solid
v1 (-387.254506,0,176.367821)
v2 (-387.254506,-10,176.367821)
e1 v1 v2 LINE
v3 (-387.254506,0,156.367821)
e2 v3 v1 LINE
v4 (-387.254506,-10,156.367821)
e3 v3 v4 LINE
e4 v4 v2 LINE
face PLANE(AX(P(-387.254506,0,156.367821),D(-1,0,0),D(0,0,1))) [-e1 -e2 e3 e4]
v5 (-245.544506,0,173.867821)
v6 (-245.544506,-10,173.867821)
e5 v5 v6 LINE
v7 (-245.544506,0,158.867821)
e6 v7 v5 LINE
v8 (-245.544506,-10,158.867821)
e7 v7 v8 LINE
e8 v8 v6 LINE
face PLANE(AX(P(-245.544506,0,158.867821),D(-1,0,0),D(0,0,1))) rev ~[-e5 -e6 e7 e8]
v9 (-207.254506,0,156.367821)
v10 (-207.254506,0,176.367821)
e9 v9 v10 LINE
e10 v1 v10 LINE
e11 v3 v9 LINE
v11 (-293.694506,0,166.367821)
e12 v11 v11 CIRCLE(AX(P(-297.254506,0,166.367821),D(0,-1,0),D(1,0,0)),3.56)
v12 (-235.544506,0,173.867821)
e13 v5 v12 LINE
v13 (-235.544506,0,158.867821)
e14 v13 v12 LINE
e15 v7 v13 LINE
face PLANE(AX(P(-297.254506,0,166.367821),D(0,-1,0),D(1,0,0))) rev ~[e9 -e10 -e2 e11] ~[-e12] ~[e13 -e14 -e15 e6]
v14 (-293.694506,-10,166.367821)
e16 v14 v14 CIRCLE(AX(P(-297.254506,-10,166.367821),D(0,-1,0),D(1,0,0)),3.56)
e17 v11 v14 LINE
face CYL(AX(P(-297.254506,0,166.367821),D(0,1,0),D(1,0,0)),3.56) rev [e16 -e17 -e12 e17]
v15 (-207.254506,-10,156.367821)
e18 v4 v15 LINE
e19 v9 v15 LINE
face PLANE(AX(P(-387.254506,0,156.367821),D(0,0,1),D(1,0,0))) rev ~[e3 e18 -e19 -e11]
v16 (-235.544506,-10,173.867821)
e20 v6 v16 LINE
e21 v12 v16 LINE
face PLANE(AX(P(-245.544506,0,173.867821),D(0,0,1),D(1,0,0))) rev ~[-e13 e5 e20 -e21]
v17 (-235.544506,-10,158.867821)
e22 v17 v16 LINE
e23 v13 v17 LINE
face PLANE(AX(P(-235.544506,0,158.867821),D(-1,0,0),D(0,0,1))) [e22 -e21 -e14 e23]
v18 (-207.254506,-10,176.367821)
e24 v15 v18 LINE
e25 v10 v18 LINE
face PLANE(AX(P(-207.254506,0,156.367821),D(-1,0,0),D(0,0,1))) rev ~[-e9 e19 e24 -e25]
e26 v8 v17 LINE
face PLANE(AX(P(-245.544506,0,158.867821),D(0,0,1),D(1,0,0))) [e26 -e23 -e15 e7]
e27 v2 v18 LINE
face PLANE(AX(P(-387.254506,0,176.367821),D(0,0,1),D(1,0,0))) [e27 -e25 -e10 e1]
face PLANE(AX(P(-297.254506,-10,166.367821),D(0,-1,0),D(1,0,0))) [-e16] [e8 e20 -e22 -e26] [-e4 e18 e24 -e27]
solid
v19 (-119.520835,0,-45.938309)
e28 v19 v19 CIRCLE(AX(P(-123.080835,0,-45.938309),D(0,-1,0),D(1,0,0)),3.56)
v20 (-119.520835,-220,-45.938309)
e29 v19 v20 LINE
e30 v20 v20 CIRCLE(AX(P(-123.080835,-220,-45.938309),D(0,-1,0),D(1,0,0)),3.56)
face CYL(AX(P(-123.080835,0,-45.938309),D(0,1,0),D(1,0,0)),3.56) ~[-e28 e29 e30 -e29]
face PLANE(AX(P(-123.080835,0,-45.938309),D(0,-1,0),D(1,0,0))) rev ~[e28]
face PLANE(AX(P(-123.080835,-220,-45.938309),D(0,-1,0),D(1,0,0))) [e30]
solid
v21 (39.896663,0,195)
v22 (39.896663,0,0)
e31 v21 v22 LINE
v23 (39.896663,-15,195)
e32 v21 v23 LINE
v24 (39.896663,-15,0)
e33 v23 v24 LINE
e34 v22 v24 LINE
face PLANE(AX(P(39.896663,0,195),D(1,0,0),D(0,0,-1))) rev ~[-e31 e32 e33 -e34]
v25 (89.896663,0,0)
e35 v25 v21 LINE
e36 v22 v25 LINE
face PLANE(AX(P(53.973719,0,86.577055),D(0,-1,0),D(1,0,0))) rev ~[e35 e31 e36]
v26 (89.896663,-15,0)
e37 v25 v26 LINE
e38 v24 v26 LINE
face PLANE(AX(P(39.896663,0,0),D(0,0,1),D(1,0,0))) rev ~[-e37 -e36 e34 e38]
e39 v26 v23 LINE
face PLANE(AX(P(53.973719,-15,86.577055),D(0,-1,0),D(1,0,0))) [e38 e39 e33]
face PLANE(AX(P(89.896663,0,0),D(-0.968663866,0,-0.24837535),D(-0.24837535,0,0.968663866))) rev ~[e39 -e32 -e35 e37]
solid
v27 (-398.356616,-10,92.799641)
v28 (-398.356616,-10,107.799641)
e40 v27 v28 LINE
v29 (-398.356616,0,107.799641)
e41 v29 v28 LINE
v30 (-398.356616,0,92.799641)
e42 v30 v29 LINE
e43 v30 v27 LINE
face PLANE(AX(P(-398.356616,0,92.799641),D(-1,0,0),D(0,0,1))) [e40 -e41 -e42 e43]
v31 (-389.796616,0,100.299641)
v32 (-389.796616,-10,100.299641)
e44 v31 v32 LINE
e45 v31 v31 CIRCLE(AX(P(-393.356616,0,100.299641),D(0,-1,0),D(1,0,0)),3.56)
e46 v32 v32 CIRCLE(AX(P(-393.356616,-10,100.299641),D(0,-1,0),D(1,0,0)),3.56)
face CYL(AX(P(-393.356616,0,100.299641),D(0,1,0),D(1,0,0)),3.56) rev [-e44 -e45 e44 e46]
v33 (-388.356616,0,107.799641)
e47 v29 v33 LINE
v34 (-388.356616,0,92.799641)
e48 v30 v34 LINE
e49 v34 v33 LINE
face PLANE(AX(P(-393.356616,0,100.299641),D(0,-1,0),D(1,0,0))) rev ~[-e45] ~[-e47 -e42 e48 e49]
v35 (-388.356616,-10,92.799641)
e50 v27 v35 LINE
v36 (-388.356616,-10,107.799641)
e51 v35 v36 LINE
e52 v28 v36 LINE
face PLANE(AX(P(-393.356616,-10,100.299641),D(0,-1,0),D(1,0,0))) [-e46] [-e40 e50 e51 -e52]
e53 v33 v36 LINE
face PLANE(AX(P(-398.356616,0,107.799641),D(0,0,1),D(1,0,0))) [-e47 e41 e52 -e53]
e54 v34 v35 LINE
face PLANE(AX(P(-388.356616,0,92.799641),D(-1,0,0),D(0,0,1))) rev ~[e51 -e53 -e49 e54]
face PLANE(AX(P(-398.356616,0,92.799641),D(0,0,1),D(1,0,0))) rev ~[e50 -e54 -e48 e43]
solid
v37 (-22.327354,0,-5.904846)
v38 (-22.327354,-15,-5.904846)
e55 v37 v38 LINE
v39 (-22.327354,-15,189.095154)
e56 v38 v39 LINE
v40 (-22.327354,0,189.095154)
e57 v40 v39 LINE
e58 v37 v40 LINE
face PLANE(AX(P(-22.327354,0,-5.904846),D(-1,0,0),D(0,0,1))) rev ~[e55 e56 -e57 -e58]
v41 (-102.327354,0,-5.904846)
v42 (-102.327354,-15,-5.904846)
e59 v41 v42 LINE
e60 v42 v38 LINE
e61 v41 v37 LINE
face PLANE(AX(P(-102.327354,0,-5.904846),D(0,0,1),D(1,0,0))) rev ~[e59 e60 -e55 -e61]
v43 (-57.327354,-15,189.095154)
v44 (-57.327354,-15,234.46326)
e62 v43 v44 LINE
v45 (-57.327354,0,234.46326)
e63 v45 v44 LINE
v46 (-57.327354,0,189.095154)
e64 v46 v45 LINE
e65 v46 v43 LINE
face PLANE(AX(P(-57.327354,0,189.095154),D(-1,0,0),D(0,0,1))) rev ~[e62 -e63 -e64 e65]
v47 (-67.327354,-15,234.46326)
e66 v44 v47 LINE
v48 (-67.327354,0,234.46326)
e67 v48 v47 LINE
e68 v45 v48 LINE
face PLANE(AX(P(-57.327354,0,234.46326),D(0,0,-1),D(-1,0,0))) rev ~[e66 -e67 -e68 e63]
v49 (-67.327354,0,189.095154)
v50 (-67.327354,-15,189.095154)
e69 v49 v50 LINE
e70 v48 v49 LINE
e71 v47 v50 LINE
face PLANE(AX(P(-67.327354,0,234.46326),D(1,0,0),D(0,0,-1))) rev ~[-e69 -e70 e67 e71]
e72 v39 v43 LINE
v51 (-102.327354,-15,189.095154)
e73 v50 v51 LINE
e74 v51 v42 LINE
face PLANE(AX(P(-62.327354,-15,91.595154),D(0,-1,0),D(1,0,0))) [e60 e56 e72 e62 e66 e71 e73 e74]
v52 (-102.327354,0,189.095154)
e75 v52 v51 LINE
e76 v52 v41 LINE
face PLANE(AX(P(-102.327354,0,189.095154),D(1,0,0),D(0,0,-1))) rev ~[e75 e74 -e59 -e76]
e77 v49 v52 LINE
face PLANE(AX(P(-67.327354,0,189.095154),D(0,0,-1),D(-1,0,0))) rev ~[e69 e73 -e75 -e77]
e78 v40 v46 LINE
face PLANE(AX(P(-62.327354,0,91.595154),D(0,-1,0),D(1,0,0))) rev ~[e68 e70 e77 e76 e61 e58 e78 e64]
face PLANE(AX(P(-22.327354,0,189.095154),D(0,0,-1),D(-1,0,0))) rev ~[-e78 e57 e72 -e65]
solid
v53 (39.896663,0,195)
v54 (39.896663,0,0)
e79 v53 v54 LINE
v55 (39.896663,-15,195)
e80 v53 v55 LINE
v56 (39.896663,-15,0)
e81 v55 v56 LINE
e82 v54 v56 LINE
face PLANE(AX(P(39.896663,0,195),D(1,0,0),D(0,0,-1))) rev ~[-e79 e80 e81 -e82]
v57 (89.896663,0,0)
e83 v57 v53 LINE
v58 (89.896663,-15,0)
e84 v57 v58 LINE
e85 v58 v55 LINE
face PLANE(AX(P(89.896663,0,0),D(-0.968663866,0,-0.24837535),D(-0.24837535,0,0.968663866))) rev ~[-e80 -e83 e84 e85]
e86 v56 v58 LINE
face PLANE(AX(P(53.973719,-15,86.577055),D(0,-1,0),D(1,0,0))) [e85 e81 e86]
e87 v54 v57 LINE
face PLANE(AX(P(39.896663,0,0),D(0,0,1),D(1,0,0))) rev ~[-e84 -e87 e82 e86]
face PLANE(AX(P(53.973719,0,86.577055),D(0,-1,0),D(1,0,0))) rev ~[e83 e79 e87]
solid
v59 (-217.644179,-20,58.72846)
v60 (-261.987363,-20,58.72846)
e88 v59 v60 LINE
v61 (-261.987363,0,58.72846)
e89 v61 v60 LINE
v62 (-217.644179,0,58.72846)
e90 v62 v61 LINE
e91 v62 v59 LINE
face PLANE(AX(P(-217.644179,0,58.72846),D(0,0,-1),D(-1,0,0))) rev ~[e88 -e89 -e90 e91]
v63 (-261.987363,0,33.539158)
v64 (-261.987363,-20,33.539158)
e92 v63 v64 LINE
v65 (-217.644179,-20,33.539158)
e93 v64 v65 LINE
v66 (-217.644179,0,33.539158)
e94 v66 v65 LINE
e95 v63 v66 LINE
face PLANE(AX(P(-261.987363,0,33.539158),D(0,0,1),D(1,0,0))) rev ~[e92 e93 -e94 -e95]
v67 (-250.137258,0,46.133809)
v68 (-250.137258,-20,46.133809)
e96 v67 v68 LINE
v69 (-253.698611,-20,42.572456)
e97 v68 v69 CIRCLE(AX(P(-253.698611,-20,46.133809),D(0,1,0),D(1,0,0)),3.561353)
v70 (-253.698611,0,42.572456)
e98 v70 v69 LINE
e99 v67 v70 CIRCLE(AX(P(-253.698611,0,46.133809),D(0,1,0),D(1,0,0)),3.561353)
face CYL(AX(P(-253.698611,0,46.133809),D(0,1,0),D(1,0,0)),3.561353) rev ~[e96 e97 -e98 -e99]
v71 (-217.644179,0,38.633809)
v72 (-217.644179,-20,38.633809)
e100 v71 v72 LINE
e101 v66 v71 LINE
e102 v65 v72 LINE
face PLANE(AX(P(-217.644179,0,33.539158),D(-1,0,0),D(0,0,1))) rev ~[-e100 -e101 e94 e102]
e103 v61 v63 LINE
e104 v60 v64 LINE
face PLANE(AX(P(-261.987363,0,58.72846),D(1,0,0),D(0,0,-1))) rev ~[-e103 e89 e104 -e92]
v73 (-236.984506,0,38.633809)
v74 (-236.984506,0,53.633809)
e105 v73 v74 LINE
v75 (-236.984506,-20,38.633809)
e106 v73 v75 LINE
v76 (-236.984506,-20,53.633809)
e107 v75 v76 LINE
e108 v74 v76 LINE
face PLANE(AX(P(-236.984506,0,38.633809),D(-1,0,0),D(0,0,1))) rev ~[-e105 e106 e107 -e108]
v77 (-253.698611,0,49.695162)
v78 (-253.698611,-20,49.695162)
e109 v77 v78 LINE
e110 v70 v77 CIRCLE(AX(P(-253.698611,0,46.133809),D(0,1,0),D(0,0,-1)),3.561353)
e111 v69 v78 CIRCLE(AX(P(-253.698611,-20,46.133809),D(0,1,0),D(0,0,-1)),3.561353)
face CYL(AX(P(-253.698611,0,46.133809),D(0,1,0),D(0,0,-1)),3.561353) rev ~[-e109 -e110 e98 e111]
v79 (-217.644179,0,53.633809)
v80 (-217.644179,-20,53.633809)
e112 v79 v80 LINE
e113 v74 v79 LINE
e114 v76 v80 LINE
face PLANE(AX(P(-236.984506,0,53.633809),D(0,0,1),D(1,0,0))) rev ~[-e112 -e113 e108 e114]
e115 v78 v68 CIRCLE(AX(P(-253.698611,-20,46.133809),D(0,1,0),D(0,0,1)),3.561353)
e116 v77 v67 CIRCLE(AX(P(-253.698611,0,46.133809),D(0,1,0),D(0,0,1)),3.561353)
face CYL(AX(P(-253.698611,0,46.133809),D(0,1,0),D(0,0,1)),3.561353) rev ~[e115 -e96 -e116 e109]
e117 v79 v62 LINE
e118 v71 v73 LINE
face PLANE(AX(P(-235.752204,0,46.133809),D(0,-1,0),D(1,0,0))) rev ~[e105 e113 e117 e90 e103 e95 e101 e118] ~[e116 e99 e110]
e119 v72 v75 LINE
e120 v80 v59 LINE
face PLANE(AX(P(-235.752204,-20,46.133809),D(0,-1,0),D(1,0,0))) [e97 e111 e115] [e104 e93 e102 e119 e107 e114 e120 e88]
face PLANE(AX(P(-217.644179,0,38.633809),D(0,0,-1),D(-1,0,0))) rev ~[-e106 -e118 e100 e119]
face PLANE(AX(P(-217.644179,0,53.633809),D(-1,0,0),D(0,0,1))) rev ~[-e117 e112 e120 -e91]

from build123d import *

# Parameters (mm, degrees)
F1_DEPTH = 20
F0_R     = 3.56
F2_DEPTH = 220
F0_W     = 180
F0_H     = 20
F0_W_2   = 10
F0_H_2   = 15
F3_DEPTH = 10
F4_DEPTH = 10
F5_DEPTH = 15
F6_DEPTH = 15


# Not quite as in the source:
# - a feature names something its author has since deleted; it is built from what else it names


with BuildPart() as f1:
    # F0 (on Front) → F1 (new body)
    with BuildSketch(Plane.XZ):
        with BuildLine():
            Line((-217.6441787565, 33.5391576588), (-217.6441787565, 38.6338087916))
            Line((-217.6441787565, 38.6338087916), (-236.9845063496, 38.6338087916))
            Line((-236.9845063496, 38.6338087916), (-236.9845063496, 53.6338087916))
            Line((-236.9845063496, 53.6338087916), (-217.6441787565, 53.6338087916))
            Line((-217.6441787565, 53.6338087916), (-217.6441787565, 58.7284599245))
            Line((-217.6441787565, 58.7284599245), (-253.6986111486, 58.7284599245))
            Line((-253.6986111486, 58.7284599245), (-253.6986111486, 49.6951619717))
            ThreePointArc((-253.6986111486, 49.6951619717), (-251.1803541648, 48.6520657755), (-250.1372579685, 46.1338087916))
            ThreePointArc((-250.1372579685, 46.1338087916), (-251.1803541648, 43.6155518078), (-253.6986111486, 42.5724556116))
            Line((-253.6986111486, 42.5724556116), (-253.6986111486, 33.5391576588))
            Line((-253.6986111486, 33.5391576588), (-217.6441787565, 33.5391576588))
        make_face()
        with BuildLine():
            Line((-261.9873631382, 33.5391576588), (-253.6986111486, 33.5391576588))
            Line((-253.6986111486, 33.5391576588), (-253.6986111486, 42.5724556116))
            ThreePointArc((-253.6986111486, 42.5724556116), (-257.2599643287, 46.1338087916), (-253.6986111486, 49.6951619717))
            Line((-253.6986111486, 49.6951619717), (-253.6986111486, 58.7284599245))
            Line((-253.6986111486, 58.7284599245), (-261.9873631382, 58.7284599245))
            Line((-261.9873631382, 58.7284599245), (-261.9873631382, 33.5391576588))
        make_face()
    extrude(amount=F1_DEPTH)


with BuildPart() as f2:
    # F0 (on Front) → F2 (new body)
    with BuildSketch(Plane.XZ):
        with Locations((-123.0808347464, -45.9383092821)):
            Circle(F0_R)
    extrude(amount=F2_DEPTH)


with BuildPart() as f3:
    # F0 (on Front) → F3 (new body)
    with BuildSketch(Plane.XZ):
        with Locations((-297.2545063496, 166.3678210974)):
            Rectangle(F0_W, F0_H)
        with Locations((-297.2545063496, 166.3678210974)):
            Circle(F0_R, mode=Mode.SUBTRACT)
        with Locations((-240.5445063496, 166.3678210974)):
            Rectangle(F0_W_2, F0_H_2, mode=Mode.SUBTRACT)
    extrude(amount=F3_DEPTH)


with BuildPart() as f4:
    # F0 (on Front) → F4 (new body)
    with BuildSketch(Plane.XZ):
        with Locations((-393.356616497, 100.299641192)):
            Rectangle(F0_W_2, F0_H_2)
        with Locations((-393.356616497, 100.299641192)):
            Circle(F0_R, mode=Mode.SUBTRACT)
    extrude(amount=F4_DEPTH)


with BuildPart() as f5:
    # F0 (on Front) → F5 (new body)
    with BuildSketch(Plane.XZ):
        Polygon((-102.3273542523, -5.9048458934), (-22.3273542523, -5.9048458934), (-22.3273542523, 189.0951541066), (-57.3273542523, 189.0951541066), (-62.3273542523, 189.0951541066), (-67.3273542523, 189.0951541066), (-102.3273542523, 189.0951541066), align=None)
        Polygon((-62.3273542523, 189.0951541066), (-57.3273542523, 189.0951541066), (-57.3273542523, 234.4632595778), (-67.3273542523, 234.4632595778), (-67.3273542523, 189.0951541066), align=None)
    extrude(amount=F5_DEPTH)


with BuildPart() as f5b:
    # F0 (on Front) → F5, piece 2 (new body)
    with BuildSketch(Plane.XZ):
        Polygon((89.8966632783, 0), (39.8966632783, 195), (39.8966632783, 0), align=None)
    extrude(amount=F5_DEPTH)


with BuildPart() as f6:
    # F0 (on Front) → F6 (new body)
    with BuildSketch(Plane.XZ):
        Polygon((89.8966632783, 0), (39.8966632783, 195), (39.8966632783, 0), align=None)
    extrude(amount=F6_DEPTH)


solid = Compound([f1.part, f2.part, f3.part, f4.part, f5.part, f5b.part, f6.part])
